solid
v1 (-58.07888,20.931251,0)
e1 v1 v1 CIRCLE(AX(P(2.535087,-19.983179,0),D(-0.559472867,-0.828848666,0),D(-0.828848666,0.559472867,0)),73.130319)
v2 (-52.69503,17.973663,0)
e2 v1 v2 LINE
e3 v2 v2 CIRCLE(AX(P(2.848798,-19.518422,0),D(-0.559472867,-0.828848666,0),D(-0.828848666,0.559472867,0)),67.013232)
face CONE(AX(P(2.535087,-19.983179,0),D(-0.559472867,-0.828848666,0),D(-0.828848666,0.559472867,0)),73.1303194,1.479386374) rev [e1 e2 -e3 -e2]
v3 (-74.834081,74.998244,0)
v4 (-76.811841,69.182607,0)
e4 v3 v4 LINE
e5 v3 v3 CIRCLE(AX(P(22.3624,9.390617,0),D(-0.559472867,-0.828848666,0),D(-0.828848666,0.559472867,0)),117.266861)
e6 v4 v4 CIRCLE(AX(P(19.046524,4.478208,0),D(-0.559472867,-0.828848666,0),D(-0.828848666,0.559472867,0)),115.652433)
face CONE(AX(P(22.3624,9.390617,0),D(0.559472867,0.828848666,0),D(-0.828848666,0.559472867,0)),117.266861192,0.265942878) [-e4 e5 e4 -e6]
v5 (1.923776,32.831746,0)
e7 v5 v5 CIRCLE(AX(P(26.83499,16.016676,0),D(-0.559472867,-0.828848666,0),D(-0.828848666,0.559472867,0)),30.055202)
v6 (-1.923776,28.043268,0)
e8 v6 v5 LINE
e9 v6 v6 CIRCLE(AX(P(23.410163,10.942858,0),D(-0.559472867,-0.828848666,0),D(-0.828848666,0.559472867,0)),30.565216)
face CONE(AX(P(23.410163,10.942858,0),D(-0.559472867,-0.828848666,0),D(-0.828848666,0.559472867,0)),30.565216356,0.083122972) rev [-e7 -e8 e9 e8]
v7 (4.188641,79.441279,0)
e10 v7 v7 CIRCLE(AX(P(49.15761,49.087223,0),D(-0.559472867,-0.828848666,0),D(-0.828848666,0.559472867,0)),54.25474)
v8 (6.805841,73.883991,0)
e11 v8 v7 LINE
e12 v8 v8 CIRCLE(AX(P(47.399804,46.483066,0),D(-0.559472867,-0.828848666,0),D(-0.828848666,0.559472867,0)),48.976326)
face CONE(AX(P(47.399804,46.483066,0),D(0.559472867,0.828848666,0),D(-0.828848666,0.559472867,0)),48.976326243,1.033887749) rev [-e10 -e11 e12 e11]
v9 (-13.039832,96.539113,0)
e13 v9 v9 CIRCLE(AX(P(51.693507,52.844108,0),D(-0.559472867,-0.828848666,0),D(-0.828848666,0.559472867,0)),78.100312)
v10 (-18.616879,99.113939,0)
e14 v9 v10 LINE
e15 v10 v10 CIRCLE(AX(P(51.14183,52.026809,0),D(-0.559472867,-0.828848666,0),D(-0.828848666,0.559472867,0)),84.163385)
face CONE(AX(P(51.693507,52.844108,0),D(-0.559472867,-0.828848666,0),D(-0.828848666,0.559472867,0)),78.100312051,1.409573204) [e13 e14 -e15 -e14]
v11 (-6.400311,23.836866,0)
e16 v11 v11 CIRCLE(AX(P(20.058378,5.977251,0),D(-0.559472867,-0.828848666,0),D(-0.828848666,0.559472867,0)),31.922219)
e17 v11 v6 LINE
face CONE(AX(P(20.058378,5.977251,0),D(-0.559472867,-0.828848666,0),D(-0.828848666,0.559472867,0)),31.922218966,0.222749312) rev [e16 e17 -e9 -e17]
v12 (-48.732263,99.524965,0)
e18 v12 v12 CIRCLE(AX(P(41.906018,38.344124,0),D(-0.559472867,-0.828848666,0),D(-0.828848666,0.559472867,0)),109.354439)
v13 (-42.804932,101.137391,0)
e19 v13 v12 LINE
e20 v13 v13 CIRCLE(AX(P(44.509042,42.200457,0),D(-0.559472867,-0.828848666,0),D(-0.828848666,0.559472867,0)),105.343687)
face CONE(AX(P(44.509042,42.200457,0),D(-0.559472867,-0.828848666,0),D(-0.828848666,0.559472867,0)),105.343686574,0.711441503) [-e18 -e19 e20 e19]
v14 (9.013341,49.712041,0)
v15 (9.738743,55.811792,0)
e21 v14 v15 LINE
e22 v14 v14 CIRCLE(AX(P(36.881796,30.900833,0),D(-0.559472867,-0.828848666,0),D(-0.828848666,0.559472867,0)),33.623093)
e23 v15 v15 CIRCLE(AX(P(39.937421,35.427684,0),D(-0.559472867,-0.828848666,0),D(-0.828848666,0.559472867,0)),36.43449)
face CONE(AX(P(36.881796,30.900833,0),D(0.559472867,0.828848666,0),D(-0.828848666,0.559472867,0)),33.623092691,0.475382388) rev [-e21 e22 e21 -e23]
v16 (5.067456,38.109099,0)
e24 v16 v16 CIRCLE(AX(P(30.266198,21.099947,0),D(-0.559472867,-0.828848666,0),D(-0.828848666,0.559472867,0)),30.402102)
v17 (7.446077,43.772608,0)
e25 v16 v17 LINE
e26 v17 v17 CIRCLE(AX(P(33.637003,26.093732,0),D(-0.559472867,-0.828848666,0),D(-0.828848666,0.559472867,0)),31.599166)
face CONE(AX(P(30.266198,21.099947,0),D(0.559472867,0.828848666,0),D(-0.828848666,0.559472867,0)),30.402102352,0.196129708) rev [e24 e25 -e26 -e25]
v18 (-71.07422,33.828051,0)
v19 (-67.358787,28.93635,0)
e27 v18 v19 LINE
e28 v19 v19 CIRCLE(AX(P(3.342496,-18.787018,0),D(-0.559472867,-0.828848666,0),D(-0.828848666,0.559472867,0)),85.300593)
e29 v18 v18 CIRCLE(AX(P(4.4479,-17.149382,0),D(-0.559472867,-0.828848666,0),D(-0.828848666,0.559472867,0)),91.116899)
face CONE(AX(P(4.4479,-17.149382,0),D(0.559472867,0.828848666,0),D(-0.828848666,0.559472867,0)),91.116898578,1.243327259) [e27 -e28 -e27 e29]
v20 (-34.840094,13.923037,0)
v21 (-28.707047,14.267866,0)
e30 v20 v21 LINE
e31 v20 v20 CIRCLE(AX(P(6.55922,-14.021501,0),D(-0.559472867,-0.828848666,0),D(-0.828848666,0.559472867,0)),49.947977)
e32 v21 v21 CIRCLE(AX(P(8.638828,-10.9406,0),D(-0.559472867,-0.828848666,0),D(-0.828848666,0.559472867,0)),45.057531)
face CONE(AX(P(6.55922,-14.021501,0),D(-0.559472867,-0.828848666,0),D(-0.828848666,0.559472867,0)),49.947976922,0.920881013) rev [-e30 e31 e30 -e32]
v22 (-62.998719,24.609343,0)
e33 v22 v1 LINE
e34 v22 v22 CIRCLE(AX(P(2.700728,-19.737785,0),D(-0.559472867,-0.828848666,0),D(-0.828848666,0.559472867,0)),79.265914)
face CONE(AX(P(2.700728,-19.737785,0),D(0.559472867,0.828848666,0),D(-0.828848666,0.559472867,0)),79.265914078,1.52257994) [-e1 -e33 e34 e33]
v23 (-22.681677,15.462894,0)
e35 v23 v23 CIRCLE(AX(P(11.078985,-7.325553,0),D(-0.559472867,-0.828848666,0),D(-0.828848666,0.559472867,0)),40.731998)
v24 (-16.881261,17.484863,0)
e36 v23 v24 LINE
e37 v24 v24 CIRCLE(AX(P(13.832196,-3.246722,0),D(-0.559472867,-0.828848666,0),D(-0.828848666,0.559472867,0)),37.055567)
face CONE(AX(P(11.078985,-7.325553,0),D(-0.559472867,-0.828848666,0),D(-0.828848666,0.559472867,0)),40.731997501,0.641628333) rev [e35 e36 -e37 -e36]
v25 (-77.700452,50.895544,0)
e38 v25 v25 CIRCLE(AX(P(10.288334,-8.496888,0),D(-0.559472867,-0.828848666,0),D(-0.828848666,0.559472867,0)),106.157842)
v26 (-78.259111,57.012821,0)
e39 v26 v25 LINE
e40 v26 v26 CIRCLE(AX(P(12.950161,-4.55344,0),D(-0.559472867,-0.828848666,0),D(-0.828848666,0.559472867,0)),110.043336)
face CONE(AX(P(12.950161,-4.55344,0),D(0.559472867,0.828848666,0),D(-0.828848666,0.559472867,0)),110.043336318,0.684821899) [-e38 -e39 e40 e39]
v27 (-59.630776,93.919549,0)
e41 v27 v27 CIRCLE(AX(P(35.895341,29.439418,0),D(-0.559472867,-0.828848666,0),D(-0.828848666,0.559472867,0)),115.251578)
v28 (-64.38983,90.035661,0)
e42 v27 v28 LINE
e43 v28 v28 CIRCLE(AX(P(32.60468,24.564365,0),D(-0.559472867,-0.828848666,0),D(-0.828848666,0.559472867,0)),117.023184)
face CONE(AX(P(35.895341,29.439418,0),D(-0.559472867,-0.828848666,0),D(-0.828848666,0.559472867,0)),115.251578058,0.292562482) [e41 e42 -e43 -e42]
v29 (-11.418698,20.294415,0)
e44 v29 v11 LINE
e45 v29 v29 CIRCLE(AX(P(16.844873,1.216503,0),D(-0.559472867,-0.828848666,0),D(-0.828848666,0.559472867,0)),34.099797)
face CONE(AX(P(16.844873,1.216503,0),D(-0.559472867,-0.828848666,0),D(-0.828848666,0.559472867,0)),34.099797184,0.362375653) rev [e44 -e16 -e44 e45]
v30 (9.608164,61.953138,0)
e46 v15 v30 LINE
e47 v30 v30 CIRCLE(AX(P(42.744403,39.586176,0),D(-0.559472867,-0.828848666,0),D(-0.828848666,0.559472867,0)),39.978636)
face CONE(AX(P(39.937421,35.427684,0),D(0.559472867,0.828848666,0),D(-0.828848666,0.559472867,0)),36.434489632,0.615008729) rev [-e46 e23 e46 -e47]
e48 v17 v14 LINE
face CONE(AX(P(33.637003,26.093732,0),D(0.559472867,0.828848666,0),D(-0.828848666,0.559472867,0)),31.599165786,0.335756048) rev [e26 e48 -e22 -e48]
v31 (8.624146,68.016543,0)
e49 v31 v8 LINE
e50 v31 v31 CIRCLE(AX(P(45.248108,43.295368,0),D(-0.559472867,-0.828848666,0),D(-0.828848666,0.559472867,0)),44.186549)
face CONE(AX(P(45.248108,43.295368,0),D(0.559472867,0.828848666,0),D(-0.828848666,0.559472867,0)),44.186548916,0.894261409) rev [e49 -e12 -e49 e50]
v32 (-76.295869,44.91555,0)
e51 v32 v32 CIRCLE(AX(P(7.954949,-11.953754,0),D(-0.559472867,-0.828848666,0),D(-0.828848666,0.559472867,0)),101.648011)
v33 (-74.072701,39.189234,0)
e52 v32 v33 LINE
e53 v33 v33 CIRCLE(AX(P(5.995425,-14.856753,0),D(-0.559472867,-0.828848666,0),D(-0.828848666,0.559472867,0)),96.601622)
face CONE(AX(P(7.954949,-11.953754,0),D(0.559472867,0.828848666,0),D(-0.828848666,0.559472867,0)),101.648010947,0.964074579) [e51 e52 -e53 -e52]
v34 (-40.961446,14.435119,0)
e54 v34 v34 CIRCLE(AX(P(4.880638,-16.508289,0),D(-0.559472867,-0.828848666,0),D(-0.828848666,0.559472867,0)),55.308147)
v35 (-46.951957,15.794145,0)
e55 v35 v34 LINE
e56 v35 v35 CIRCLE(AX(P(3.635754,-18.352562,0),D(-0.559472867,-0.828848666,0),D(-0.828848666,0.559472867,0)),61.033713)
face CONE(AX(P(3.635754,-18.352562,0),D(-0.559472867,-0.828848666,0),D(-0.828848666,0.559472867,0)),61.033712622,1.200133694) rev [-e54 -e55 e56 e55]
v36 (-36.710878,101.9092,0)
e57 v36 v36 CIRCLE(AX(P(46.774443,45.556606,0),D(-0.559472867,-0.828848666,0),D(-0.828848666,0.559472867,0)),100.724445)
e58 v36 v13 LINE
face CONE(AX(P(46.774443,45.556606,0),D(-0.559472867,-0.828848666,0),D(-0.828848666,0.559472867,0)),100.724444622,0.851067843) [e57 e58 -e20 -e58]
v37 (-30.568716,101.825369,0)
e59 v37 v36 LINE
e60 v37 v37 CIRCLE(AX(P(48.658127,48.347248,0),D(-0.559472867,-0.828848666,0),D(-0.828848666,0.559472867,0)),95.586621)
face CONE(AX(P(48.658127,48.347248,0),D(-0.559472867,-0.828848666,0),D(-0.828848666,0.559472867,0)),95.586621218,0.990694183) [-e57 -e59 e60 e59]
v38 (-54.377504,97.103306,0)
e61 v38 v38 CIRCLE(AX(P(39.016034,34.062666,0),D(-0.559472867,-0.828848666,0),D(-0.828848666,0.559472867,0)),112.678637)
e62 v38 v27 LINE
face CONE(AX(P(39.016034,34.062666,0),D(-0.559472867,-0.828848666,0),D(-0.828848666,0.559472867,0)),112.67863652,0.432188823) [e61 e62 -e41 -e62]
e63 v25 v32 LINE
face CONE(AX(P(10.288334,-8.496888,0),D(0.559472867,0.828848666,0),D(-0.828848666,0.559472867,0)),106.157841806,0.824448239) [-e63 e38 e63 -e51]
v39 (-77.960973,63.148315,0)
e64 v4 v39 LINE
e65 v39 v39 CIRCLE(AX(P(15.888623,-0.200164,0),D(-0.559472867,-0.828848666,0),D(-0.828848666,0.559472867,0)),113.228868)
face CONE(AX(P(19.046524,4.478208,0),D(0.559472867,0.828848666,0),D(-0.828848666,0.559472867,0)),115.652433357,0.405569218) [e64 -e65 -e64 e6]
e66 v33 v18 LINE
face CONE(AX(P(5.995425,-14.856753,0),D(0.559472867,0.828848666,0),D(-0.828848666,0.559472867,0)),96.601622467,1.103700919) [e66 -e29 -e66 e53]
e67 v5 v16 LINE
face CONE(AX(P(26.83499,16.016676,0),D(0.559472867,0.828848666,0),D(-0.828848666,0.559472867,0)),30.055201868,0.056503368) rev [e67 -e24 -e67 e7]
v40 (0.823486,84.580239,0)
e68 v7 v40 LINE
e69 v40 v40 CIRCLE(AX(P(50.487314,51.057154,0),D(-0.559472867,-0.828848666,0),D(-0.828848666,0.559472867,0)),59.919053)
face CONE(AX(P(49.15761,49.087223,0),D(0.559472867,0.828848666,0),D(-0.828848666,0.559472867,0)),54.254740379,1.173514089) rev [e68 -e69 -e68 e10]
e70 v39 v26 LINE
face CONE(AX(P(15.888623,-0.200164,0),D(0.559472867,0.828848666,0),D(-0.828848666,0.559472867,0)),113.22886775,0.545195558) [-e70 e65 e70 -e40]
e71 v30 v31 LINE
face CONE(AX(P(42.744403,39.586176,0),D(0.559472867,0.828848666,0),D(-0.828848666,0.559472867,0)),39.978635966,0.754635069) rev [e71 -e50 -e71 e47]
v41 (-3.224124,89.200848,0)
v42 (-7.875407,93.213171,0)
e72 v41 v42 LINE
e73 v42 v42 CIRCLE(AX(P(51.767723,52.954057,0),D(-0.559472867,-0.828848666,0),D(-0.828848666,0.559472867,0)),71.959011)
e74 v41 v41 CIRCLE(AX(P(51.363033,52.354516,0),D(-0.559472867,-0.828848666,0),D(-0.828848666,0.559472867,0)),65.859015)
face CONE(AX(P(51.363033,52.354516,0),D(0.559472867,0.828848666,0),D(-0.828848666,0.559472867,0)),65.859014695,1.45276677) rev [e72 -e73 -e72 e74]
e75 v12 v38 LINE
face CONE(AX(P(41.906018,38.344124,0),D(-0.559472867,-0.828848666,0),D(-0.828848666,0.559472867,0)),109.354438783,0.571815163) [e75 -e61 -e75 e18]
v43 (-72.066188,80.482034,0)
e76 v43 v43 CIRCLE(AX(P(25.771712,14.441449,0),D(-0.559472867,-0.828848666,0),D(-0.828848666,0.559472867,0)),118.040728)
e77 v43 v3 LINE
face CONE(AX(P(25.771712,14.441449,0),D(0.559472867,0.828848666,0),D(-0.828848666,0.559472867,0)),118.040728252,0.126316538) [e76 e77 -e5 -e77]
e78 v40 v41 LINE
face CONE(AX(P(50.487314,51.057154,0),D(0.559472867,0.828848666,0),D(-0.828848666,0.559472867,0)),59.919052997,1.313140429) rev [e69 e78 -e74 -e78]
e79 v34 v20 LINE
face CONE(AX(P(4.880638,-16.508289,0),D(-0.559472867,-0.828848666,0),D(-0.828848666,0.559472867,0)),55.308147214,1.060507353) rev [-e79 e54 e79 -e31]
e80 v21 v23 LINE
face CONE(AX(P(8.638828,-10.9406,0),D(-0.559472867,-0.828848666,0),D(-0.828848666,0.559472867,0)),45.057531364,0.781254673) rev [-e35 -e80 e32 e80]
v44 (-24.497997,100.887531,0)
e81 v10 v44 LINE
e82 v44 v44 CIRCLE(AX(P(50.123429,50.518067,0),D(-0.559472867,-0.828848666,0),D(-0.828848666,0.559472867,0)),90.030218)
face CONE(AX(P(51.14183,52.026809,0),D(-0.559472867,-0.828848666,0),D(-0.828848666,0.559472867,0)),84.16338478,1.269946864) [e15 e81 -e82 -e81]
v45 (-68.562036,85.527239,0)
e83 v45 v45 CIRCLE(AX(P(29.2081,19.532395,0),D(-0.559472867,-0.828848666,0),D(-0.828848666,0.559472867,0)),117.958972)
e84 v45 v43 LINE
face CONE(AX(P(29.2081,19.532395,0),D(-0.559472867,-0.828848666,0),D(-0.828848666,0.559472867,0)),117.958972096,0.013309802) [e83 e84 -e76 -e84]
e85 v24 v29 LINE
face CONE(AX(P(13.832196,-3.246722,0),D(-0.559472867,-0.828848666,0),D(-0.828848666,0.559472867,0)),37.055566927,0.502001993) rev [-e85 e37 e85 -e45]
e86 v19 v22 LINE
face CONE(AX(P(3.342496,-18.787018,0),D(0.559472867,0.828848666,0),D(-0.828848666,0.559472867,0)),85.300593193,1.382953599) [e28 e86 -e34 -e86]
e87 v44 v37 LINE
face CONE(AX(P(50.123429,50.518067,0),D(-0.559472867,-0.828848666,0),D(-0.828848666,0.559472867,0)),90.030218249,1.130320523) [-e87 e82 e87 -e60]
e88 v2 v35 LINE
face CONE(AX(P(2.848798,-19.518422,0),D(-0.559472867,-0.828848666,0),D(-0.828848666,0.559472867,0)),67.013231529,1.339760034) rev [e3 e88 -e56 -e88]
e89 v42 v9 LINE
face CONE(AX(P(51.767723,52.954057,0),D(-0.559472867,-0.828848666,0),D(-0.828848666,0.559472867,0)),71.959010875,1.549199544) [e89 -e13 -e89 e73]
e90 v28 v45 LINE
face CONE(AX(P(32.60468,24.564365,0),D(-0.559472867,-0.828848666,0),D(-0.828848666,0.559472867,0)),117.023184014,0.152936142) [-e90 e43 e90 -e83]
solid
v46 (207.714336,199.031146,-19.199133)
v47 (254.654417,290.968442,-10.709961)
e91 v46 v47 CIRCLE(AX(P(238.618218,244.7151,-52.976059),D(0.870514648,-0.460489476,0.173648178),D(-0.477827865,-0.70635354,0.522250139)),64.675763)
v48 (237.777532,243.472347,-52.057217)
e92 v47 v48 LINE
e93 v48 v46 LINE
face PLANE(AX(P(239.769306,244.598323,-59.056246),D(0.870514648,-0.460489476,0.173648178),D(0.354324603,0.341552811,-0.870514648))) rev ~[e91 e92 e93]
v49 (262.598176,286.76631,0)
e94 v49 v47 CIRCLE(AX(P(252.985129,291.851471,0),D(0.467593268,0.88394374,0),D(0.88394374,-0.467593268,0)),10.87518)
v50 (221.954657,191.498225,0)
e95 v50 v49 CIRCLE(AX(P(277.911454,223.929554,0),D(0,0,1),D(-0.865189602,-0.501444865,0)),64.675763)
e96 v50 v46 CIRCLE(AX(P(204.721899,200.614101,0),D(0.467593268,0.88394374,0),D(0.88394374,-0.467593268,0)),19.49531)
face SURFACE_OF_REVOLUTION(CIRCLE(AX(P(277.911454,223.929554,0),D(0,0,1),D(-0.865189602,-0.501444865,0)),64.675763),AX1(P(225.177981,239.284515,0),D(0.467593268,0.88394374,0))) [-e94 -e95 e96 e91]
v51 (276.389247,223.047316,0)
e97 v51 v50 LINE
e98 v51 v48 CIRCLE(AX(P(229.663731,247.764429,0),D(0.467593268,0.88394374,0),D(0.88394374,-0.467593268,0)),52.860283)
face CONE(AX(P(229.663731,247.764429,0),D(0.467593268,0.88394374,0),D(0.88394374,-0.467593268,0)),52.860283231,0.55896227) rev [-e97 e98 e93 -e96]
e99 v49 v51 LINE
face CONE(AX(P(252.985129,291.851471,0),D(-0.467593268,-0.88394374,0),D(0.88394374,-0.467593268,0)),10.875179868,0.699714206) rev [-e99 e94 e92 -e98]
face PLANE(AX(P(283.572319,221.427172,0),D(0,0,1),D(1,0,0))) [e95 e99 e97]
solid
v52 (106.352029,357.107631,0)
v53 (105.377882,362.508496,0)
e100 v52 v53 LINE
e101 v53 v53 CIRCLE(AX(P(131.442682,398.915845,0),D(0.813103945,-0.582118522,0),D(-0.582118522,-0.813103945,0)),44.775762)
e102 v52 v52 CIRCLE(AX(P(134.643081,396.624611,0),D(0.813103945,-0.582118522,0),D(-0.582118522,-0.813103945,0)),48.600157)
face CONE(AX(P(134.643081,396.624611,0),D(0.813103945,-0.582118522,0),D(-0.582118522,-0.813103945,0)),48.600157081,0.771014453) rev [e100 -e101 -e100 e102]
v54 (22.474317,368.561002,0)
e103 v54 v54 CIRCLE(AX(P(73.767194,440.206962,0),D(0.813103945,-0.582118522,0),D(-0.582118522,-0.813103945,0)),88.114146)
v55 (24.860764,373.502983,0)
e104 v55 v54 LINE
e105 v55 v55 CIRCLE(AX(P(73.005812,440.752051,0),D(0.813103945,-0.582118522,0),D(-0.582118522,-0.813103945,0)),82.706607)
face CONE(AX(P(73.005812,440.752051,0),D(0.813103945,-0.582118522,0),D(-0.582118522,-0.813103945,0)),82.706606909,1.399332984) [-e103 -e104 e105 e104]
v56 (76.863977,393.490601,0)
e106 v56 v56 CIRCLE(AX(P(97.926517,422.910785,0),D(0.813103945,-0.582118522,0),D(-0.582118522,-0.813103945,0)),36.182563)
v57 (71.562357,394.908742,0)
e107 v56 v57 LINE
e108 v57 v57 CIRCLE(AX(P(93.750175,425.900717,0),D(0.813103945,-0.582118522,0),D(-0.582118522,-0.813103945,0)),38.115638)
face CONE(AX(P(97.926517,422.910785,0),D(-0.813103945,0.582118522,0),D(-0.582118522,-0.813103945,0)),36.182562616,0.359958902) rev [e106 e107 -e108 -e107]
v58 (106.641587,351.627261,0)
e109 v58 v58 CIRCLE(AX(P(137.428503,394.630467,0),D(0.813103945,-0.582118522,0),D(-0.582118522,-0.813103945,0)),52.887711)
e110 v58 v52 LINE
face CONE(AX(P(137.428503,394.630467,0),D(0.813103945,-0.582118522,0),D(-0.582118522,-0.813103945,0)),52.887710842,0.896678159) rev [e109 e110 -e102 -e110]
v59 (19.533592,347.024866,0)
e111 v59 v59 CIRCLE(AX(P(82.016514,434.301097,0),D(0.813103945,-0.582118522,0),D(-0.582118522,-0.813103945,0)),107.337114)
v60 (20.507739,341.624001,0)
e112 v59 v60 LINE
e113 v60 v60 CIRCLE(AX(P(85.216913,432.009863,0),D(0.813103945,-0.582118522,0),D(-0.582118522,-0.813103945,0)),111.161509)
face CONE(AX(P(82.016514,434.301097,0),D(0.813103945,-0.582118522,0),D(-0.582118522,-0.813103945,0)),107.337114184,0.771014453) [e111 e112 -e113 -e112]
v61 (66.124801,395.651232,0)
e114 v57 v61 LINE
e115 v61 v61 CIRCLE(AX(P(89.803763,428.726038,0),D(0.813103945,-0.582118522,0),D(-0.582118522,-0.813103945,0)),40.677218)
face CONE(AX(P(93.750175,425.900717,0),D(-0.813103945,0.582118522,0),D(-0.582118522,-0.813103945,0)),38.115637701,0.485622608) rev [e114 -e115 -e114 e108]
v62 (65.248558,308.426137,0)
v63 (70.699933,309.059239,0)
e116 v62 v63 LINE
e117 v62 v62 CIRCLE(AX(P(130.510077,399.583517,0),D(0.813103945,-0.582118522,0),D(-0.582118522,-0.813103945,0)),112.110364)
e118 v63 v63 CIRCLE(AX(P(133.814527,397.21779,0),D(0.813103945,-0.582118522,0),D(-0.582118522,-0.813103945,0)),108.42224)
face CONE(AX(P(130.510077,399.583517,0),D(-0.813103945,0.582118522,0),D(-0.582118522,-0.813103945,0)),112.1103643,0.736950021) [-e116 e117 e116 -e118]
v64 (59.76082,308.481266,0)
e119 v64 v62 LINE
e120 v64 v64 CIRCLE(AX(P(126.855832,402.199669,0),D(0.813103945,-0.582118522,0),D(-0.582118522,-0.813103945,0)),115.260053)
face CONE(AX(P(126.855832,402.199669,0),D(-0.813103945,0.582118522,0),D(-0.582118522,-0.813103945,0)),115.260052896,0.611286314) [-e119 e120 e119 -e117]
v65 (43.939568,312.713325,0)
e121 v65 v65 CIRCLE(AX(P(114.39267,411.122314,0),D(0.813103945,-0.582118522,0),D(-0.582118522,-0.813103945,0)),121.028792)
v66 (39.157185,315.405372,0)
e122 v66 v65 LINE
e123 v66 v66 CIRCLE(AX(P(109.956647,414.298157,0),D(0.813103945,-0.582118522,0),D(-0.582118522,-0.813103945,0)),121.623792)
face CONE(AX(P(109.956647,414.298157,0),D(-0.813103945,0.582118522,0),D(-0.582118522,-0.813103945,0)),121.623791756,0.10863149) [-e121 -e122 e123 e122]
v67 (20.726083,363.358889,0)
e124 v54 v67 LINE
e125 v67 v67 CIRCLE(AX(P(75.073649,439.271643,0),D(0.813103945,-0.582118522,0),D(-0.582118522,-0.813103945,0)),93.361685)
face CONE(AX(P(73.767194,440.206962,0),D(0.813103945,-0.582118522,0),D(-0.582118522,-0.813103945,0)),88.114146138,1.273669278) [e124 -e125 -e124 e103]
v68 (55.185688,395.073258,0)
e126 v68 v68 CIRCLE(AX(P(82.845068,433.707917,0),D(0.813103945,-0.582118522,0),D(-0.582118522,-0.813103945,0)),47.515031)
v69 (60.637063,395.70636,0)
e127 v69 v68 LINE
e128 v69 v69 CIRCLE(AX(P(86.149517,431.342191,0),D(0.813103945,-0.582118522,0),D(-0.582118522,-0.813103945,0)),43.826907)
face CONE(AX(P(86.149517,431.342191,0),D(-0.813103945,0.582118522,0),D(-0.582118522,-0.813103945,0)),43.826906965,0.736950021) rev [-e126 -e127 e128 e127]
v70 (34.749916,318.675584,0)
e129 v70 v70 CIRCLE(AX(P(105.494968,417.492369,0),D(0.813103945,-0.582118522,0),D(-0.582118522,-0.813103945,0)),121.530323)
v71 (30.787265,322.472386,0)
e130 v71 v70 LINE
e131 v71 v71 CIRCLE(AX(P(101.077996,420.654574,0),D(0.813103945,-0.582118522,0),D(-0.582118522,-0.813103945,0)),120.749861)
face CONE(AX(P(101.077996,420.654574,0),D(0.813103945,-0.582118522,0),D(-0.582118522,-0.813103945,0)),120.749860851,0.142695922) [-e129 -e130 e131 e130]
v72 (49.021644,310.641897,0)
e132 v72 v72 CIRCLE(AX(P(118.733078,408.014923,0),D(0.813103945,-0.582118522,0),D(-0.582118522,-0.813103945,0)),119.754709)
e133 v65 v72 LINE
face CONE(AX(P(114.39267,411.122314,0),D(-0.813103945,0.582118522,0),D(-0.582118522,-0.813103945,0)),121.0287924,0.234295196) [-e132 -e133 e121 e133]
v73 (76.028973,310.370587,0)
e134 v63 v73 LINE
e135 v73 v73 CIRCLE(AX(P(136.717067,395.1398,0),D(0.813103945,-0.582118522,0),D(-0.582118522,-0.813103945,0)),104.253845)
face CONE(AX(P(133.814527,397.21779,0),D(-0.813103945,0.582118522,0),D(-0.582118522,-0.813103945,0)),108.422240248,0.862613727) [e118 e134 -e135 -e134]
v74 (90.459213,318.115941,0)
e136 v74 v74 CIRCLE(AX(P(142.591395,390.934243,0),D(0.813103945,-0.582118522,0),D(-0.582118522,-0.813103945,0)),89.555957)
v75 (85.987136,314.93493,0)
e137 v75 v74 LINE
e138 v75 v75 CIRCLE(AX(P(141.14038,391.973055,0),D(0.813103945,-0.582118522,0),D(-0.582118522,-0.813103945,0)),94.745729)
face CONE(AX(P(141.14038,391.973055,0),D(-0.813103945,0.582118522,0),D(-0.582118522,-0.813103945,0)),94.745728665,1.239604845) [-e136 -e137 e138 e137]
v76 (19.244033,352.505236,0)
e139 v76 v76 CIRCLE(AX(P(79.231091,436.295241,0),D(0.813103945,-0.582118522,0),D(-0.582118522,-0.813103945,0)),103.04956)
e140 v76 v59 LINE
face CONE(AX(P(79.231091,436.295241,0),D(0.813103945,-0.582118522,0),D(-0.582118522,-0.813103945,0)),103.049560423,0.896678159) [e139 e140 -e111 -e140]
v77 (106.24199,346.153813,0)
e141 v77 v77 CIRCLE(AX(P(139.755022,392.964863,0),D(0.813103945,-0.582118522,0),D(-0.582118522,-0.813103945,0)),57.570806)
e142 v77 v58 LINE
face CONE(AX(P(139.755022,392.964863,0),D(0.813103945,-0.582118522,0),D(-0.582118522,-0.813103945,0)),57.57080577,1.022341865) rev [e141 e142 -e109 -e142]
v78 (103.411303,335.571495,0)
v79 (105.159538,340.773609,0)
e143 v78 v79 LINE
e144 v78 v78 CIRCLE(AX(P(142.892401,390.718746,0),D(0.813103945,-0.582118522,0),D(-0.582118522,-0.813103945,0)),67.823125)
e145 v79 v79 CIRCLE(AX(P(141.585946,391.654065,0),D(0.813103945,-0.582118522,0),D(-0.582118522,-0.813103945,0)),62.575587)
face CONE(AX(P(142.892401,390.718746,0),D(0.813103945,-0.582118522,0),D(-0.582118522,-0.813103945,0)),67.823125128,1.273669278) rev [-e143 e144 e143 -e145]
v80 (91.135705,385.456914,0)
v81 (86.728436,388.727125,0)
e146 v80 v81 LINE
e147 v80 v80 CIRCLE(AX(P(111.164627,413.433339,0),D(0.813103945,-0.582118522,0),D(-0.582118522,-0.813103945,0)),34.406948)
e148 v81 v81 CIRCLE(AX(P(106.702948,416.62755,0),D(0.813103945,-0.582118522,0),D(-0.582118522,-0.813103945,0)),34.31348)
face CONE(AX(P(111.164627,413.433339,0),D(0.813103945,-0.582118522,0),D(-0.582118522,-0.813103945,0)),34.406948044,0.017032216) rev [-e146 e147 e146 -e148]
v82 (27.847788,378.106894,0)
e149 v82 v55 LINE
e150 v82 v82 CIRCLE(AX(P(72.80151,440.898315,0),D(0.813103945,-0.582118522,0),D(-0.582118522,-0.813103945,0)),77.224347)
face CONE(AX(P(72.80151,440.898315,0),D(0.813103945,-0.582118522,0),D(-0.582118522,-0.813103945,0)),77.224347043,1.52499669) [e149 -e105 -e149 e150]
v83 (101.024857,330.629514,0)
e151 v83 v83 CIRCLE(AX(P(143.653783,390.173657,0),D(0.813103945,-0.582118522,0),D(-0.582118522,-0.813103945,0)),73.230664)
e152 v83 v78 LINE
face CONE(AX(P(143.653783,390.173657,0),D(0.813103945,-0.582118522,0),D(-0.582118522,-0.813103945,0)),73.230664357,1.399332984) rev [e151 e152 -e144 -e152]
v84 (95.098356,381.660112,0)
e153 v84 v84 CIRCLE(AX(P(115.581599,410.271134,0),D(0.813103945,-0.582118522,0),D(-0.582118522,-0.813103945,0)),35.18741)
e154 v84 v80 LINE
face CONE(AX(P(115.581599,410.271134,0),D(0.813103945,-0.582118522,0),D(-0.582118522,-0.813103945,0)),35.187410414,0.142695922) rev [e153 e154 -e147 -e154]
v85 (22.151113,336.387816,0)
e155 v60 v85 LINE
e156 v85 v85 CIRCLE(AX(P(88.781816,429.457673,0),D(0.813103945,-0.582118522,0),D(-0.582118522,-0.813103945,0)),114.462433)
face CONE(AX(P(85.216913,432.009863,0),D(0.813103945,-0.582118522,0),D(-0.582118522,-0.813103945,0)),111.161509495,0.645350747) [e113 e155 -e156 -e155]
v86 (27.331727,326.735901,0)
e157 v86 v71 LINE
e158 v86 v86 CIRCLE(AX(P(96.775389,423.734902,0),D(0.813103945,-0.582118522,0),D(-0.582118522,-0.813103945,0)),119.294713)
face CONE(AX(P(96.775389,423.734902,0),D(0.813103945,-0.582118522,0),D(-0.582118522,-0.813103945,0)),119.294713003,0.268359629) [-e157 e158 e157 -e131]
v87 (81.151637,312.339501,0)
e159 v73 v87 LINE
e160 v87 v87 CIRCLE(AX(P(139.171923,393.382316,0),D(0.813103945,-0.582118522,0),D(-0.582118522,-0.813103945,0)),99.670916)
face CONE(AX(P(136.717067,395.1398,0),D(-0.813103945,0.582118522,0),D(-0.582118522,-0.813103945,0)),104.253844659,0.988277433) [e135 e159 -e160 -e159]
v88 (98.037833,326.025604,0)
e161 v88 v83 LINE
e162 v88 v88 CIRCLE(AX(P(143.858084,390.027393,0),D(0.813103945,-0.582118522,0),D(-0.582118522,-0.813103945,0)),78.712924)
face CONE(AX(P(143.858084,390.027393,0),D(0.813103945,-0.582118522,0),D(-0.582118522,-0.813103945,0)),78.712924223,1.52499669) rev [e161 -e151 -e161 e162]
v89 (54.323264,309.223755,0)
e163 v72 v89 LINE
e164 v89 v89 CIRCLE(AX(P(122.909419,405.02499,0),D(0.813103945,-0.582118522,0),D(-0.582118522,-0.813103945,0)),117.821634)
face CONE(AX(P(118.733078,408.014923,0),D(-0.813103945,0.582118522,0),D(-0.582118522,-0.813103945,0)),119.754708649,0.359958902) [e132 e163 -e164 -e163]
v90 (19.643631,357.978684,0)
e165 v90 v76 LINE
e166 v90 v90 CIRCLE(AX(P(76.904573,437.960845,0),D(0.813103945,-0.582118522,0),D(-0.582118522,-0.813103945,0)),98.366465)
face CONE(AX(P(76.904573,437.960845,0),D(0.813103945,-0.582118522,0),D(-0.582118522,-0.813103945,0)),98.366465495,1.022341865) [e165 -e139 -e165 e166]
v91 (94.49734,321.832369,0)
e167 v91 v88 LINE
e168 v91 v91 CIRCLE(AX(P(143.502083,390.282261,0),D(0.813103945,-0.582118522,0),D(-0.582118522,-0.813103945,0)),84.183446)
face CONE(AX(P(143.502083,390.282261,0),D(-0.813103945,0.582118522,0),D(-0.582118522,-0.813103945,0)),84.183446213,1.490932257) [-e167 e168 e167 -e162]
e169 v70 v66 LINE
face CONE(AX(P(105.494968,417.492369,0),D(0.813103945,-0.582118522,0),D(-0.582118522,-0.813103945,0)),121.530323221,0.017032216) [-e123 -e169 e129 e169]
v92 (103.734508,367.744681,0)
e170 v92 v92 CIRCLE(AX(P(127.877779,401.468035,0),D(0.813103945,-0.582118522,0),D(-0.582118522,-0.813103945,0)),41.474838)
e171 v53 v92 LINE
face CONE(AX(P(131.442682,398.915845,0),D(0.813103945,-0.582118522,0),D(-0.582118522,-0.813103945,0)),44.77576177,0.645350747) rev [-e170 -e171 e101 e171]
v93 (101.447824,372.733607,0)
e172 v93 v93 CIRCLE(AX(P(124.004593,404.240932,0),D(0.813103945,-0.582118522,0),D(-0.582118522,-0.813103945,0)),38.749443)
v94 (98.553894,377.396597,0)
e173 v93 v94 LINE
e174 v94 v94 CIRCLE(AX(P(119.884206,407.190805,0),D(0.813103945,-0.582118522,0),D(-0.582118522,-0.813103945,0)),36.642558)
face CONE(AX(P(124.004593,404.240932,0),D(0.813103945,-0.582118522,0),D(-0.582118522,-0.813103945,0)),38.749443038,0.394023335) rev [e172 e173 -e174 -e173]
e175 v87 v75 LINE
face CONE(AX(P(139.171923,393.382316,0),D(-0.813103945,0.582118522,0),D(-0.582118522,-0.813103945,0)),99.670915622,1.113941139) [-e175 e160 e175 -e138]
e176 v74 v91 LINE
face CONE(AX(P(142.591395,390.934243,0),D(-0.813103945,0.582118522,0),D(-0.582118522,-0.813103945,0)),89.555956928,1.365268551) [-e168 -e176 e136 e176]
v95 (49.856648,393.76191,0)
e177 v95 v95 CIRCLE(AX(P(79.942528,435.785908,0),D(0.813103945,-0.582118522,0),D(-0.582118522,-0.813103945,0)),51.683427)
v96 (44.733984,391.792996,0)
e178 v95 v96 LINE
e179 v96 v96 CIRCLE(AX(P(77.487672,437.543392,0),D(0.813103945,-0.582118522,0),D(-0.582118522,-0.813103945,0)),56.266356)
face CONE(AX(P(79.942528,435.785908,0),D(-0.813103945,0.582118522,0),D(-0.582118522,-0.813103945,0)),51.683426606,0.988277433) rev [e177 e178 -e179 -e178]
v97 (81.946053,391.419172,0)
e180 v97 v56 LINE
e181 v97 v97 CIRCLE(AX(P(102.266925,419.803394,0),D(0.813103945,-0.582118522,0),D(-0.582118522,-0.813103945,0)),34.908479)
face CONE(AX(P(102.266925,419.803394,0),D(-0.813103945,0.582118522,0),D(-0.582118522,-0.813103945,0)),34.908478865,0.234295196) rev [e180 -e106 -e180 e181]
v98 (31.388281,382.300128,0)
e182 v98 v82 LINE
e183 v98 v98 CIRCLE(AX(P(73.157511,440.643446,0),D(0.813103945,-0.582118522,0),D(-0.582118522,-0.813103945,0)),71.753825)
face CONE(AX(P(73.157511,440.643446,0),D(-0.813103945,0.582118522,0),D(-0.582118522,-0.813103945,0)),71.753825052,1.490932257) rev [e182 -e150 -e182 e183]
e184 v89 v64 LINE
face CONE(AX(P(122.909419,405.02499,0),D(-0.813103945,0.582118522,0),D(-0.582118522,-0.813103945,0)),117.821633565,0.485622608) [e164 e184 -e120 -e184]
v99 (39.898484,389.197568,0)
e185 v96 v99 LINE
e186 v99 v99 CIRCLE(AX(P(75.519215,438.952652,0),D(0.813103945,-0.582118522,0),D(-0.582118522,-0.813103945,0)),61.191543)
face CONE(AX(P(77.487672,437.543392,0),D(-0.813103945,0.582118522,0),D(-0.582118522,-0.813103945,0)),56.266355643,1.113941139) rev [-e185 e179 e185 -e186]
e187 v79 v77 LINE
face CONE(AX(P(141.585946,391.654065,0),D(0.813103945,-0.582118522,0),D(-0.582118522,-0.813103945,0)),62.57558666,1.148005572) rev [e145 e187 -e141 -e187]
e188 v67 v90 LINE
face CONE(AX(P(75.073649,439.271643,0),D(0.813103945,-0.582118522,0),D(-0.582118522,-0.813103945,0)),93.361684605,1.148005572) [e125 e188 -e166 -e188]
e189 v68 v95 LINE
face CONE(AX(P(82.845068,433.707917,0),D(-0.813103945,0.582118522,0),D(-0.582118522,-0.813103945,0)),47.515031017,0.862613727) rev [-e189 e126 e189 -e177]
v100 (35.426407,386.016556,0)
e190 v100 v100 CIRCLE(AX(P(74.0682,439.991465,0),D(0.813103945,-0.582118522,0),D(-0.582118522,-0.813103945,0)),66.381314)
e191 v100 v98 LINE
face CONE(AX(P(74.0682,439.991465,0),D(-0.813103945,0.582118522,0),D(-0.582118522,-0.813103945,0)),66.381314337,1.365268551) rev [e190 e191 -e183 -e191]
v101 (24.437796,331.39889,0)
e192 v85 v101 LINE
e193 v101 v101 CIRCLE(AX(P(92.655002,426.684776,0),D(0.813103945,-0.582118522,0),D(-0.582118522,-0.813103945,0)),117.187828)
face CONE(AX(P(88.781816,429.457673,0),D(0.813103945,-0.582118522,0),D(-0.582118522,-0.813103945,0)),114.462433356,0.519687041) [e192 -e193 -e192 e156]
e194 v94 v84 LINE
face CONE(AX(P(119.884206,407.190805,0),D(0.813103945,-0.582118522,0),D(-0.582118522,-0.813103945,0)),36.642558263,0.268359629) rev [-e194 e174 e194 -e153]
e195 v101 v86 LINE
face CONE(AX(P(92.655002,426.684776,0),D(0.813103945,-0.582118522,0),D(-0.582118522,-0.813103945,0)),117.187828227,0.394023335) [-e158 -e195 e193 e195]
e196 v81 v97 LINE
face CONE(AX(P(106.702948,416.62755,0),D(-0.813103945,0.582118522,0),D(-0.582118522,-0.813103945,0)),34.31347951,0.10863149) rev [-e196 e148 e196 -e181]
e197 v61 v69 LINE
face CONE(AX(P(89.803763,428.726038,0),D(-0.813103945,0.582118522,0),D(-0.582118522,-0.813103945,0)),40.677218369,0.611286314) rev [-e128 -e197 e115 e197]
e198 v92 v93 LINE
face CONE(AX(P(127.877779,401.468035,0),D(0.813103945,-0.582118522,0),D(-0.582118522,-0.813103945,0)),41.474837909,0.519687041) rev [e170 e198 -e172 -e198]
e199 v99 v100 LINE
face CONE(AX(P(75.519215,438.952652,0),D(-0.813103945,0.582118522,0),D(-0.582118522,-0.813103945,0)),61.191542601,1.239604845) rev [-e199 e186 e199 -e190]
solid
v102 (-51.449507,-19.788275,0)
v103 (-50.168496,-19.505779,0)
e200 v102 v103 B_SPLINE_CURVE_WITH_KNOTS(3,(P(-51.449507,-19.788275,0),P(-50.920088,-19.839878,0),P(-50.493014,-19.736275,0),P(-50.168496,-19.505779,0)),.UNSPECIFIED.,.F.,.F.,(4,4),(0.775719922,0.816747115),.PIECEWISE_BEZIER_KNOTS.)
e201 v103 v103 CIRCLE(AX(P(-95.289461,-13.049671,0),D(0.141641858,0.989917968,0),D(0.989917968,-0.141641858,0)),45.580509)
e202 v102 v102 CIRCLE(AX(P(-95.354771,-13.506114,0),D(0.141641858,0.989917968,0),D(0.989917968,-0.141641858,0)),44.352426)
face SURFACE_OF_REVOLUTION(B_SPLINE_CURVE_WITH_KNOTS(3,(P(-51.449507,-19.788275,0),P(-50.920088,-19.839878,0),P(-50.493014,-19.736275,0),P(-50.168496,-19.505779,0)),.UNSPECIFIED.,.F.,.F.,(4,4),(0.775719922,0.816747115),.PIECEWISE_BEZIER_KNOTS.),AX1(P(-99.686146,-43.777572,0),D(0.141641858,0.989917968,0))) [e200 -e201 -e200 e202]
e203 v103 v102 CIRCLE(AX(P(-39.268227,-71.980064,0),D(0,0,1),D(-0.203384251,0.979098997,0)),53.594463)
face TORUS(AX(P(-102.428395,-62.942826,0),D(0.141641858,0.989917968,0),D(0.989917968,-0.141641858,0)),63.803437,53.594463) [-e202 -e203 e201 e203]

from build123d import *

# Parameters (mm, degrees)
F5_ANGLE = 80


with BuildPart() as f1:
    # F0 (on Top) → F1 (revolve)
    with BuildSketch(Plane.XY):
        Polygon((-1.9237758445, 28.0432676629), (1.9237758445, 32.8317458078), (5.0674560726, 38.1090985122), (7.4460766801, 43.7726081086), (9.0133405225, 49.7120408249), (9.7387425919, 55.8117923592), (9.6081637621, 61.9531379864), (8.6241456014, 68.0165433994), (6.8058409042, 73.883991309), (4.188640903, 79.4412785156), (0.8234864188, 84.5802387451), (-3.2241236441, 89.2008479822), (-7.87540716, 93.2131713239), (-13.039832186, 96.5391134602), (-18.6168790633, 99.1139387108), (-24.4979969184, 100.887531031), (-30.5687164818, 101.8253694636), (-36.7108781026, 101.9092000503), (-42.8049315914, 101.1373911242), (-48.732263129, 99.524965068), (-54.3775039492, 97.1033059208), (-59.6307758609, 93.9195485234), (-64.3898299017, 90.035661092), (-68.5620364981, 85.5272390776), (-72.0661883946, 80.4820337864), (-74.8340812603, 74.9982444007), (-76.8118412091, 69.1826066431), (-77.9609733932, 63.1483152873), (-78.2591112619, 57.0128209507), (-77.7004519005, 50.8955440515), (-76.2958689782, 44.9155504263), (-74.0727011037, 39.1892338488), (-71.074219711, 33.8280505577), (-67.3587868297, 28.9363498874), (-62.9987191346, 24.6093432273), (-58.0788803837, 20.9312508401), (-52.6950296422, 17.9736626103), (-46.9519574408, 15.7941446287), (-40.9614461471, 14.4351187336), (-34.8400942495, 13.9230368181), (-28.7070468995, 14.2678659743), (-22.6816768878, 15.4628944949), (-16.8812611878, 17.484862509), (-11.4186982932, 20.2944147092), (-6.4003107772, 23.8368663578), align=None)
    revolve(axis=Axis((39.8637475446, 35.3185385466, 0), (-0.559472867, -0.828848666, 0)))


with BuildPart() as f3:
    # F2 (on Top) → F3 (revolve)
    with BuildSketch(Plane.XY):
        with BuildLine():
            add(Edge.make_bspline(
                [(-51.4495074749, -19.7882745415), (-50.9200883915, -19.8398778668), (-50.493013893, -19.7362751838), (-50.1684964465, -19.505778796)],
                knots=[0.7757199217, 0.7757199217, 0.7757199217, 0.7757199217, 0.8167471148, 0.8167471148, 0.8167471148, 0.8167471148], degree=3))
            ThreePointArc((-50.1684964465, -19.505778796), (-50.8098662967, -19.643107233), (-51.4495074749, -19.7882745415))
        make_face()
    revolve(axis=Axis((-99.6861457825, -43.7775719911, 0), (0.1416418581, 0.9899179683, 0)))


with BuildPart() as f5:
    # F4 (on Top) → F5 (revolve)
    with BuildSketch(Plane.XY):
        with BuildLine():
            Line((276.3892473231, 223.0473164586), (221.9546566931, 191.4982249494))
            ThreePointArc((221.9546566931, 191.4982249494), (337.3997552126, 198.5504997973), (262.5981761207, 286.7663097072))
            Line((262.5981761207, 286.7663097072), (276.3892473231, 223.0473164586))
        make_face()
    revolve(axis=Axis((225.1779809594, 239.2845153809, 0), (0.4675932683, 0.88394374, 0)), revolution_arc=F5_ANGLE)


with BuildPart() as f7:
    # F6 (on Top) → F7 (revolve)
    with BuildSketch(Plane.XY):
        Polygon((86.7284355387, 388.7271249301), (81.9460526109, 391.419172287), (76.8639772007, 393.4906005299), (71.5623566734, 394.9087419981), (66.1248007515, 395.6512317534), (60.6370629403, 395.7063602888), (55.1856881432, 395.0732581945), (49.8566477974, 393.7619098685), (44.7339840523, 391.7929960575), (39.8984843756, 389.1975677083), (35.4264074855, 386.0165562764), (31.3882807062, 382.3001282125), (27.8477877093, 378.1068938071), (24.8607641843, 373.5029828717), (22.4743172765, 368.561001832), (20.7260826793, 363.3588886813), (19.6436310967, 357.9786838514), (19.2440334366, 352.5052363866), (19.5335915929, 347.0248658231), (20.5077390606, 341.6240008783), (22.1511129521, 336.3878164189), (24.4377962794, 331.3988902018), (27.3317266805, 326.7359005735), (30.7872651442, 322.472385666), (34.7499157647, 318.6755836565), (39.1571851746, 315.4053723806), (43.9395681024, 312.7133250237), (49.0216435125, 310.6418967807), (54.3232640399, 309.2237553125), (59.7608199617, 308.4812655572), (65.2485577729, 308.4261370218), (70.69993257, 309.0592391162), (76.0289729159, 310.3705874421), (81.1516366609, 312.3395012532), (85.9871363377, 314.9349296024), (90.4592132277, 318.1159410342), (94.497340007, 321.8323690981), (98.0378330039, 326.0256035036), (101.0248565289, 330.6295144389), (103.4113034367, 335.5714954786), (105.1595380339, 340.7736086293), (106.2419896166, 346.1538134592), (106.6415872766, 351.627260924), (106.3520291203, 357.1076314876), (105.3778816526, 362.5084964323), (103.7345077612, 367.7446808917), (101.4478244338, 372.7336071089), (98.5538940327, 377.3965967372), (95.098355569, 381.6601116446), (91.1357049485, 385.4569136542), align=None)
    revolve(axis=Axis((113.7847863138, 411.5575104952, 0), (0.8131039454, -0.5821185223, 0)))


solid = Compound([f1.part, f3.part, f5.part, f7.part])
